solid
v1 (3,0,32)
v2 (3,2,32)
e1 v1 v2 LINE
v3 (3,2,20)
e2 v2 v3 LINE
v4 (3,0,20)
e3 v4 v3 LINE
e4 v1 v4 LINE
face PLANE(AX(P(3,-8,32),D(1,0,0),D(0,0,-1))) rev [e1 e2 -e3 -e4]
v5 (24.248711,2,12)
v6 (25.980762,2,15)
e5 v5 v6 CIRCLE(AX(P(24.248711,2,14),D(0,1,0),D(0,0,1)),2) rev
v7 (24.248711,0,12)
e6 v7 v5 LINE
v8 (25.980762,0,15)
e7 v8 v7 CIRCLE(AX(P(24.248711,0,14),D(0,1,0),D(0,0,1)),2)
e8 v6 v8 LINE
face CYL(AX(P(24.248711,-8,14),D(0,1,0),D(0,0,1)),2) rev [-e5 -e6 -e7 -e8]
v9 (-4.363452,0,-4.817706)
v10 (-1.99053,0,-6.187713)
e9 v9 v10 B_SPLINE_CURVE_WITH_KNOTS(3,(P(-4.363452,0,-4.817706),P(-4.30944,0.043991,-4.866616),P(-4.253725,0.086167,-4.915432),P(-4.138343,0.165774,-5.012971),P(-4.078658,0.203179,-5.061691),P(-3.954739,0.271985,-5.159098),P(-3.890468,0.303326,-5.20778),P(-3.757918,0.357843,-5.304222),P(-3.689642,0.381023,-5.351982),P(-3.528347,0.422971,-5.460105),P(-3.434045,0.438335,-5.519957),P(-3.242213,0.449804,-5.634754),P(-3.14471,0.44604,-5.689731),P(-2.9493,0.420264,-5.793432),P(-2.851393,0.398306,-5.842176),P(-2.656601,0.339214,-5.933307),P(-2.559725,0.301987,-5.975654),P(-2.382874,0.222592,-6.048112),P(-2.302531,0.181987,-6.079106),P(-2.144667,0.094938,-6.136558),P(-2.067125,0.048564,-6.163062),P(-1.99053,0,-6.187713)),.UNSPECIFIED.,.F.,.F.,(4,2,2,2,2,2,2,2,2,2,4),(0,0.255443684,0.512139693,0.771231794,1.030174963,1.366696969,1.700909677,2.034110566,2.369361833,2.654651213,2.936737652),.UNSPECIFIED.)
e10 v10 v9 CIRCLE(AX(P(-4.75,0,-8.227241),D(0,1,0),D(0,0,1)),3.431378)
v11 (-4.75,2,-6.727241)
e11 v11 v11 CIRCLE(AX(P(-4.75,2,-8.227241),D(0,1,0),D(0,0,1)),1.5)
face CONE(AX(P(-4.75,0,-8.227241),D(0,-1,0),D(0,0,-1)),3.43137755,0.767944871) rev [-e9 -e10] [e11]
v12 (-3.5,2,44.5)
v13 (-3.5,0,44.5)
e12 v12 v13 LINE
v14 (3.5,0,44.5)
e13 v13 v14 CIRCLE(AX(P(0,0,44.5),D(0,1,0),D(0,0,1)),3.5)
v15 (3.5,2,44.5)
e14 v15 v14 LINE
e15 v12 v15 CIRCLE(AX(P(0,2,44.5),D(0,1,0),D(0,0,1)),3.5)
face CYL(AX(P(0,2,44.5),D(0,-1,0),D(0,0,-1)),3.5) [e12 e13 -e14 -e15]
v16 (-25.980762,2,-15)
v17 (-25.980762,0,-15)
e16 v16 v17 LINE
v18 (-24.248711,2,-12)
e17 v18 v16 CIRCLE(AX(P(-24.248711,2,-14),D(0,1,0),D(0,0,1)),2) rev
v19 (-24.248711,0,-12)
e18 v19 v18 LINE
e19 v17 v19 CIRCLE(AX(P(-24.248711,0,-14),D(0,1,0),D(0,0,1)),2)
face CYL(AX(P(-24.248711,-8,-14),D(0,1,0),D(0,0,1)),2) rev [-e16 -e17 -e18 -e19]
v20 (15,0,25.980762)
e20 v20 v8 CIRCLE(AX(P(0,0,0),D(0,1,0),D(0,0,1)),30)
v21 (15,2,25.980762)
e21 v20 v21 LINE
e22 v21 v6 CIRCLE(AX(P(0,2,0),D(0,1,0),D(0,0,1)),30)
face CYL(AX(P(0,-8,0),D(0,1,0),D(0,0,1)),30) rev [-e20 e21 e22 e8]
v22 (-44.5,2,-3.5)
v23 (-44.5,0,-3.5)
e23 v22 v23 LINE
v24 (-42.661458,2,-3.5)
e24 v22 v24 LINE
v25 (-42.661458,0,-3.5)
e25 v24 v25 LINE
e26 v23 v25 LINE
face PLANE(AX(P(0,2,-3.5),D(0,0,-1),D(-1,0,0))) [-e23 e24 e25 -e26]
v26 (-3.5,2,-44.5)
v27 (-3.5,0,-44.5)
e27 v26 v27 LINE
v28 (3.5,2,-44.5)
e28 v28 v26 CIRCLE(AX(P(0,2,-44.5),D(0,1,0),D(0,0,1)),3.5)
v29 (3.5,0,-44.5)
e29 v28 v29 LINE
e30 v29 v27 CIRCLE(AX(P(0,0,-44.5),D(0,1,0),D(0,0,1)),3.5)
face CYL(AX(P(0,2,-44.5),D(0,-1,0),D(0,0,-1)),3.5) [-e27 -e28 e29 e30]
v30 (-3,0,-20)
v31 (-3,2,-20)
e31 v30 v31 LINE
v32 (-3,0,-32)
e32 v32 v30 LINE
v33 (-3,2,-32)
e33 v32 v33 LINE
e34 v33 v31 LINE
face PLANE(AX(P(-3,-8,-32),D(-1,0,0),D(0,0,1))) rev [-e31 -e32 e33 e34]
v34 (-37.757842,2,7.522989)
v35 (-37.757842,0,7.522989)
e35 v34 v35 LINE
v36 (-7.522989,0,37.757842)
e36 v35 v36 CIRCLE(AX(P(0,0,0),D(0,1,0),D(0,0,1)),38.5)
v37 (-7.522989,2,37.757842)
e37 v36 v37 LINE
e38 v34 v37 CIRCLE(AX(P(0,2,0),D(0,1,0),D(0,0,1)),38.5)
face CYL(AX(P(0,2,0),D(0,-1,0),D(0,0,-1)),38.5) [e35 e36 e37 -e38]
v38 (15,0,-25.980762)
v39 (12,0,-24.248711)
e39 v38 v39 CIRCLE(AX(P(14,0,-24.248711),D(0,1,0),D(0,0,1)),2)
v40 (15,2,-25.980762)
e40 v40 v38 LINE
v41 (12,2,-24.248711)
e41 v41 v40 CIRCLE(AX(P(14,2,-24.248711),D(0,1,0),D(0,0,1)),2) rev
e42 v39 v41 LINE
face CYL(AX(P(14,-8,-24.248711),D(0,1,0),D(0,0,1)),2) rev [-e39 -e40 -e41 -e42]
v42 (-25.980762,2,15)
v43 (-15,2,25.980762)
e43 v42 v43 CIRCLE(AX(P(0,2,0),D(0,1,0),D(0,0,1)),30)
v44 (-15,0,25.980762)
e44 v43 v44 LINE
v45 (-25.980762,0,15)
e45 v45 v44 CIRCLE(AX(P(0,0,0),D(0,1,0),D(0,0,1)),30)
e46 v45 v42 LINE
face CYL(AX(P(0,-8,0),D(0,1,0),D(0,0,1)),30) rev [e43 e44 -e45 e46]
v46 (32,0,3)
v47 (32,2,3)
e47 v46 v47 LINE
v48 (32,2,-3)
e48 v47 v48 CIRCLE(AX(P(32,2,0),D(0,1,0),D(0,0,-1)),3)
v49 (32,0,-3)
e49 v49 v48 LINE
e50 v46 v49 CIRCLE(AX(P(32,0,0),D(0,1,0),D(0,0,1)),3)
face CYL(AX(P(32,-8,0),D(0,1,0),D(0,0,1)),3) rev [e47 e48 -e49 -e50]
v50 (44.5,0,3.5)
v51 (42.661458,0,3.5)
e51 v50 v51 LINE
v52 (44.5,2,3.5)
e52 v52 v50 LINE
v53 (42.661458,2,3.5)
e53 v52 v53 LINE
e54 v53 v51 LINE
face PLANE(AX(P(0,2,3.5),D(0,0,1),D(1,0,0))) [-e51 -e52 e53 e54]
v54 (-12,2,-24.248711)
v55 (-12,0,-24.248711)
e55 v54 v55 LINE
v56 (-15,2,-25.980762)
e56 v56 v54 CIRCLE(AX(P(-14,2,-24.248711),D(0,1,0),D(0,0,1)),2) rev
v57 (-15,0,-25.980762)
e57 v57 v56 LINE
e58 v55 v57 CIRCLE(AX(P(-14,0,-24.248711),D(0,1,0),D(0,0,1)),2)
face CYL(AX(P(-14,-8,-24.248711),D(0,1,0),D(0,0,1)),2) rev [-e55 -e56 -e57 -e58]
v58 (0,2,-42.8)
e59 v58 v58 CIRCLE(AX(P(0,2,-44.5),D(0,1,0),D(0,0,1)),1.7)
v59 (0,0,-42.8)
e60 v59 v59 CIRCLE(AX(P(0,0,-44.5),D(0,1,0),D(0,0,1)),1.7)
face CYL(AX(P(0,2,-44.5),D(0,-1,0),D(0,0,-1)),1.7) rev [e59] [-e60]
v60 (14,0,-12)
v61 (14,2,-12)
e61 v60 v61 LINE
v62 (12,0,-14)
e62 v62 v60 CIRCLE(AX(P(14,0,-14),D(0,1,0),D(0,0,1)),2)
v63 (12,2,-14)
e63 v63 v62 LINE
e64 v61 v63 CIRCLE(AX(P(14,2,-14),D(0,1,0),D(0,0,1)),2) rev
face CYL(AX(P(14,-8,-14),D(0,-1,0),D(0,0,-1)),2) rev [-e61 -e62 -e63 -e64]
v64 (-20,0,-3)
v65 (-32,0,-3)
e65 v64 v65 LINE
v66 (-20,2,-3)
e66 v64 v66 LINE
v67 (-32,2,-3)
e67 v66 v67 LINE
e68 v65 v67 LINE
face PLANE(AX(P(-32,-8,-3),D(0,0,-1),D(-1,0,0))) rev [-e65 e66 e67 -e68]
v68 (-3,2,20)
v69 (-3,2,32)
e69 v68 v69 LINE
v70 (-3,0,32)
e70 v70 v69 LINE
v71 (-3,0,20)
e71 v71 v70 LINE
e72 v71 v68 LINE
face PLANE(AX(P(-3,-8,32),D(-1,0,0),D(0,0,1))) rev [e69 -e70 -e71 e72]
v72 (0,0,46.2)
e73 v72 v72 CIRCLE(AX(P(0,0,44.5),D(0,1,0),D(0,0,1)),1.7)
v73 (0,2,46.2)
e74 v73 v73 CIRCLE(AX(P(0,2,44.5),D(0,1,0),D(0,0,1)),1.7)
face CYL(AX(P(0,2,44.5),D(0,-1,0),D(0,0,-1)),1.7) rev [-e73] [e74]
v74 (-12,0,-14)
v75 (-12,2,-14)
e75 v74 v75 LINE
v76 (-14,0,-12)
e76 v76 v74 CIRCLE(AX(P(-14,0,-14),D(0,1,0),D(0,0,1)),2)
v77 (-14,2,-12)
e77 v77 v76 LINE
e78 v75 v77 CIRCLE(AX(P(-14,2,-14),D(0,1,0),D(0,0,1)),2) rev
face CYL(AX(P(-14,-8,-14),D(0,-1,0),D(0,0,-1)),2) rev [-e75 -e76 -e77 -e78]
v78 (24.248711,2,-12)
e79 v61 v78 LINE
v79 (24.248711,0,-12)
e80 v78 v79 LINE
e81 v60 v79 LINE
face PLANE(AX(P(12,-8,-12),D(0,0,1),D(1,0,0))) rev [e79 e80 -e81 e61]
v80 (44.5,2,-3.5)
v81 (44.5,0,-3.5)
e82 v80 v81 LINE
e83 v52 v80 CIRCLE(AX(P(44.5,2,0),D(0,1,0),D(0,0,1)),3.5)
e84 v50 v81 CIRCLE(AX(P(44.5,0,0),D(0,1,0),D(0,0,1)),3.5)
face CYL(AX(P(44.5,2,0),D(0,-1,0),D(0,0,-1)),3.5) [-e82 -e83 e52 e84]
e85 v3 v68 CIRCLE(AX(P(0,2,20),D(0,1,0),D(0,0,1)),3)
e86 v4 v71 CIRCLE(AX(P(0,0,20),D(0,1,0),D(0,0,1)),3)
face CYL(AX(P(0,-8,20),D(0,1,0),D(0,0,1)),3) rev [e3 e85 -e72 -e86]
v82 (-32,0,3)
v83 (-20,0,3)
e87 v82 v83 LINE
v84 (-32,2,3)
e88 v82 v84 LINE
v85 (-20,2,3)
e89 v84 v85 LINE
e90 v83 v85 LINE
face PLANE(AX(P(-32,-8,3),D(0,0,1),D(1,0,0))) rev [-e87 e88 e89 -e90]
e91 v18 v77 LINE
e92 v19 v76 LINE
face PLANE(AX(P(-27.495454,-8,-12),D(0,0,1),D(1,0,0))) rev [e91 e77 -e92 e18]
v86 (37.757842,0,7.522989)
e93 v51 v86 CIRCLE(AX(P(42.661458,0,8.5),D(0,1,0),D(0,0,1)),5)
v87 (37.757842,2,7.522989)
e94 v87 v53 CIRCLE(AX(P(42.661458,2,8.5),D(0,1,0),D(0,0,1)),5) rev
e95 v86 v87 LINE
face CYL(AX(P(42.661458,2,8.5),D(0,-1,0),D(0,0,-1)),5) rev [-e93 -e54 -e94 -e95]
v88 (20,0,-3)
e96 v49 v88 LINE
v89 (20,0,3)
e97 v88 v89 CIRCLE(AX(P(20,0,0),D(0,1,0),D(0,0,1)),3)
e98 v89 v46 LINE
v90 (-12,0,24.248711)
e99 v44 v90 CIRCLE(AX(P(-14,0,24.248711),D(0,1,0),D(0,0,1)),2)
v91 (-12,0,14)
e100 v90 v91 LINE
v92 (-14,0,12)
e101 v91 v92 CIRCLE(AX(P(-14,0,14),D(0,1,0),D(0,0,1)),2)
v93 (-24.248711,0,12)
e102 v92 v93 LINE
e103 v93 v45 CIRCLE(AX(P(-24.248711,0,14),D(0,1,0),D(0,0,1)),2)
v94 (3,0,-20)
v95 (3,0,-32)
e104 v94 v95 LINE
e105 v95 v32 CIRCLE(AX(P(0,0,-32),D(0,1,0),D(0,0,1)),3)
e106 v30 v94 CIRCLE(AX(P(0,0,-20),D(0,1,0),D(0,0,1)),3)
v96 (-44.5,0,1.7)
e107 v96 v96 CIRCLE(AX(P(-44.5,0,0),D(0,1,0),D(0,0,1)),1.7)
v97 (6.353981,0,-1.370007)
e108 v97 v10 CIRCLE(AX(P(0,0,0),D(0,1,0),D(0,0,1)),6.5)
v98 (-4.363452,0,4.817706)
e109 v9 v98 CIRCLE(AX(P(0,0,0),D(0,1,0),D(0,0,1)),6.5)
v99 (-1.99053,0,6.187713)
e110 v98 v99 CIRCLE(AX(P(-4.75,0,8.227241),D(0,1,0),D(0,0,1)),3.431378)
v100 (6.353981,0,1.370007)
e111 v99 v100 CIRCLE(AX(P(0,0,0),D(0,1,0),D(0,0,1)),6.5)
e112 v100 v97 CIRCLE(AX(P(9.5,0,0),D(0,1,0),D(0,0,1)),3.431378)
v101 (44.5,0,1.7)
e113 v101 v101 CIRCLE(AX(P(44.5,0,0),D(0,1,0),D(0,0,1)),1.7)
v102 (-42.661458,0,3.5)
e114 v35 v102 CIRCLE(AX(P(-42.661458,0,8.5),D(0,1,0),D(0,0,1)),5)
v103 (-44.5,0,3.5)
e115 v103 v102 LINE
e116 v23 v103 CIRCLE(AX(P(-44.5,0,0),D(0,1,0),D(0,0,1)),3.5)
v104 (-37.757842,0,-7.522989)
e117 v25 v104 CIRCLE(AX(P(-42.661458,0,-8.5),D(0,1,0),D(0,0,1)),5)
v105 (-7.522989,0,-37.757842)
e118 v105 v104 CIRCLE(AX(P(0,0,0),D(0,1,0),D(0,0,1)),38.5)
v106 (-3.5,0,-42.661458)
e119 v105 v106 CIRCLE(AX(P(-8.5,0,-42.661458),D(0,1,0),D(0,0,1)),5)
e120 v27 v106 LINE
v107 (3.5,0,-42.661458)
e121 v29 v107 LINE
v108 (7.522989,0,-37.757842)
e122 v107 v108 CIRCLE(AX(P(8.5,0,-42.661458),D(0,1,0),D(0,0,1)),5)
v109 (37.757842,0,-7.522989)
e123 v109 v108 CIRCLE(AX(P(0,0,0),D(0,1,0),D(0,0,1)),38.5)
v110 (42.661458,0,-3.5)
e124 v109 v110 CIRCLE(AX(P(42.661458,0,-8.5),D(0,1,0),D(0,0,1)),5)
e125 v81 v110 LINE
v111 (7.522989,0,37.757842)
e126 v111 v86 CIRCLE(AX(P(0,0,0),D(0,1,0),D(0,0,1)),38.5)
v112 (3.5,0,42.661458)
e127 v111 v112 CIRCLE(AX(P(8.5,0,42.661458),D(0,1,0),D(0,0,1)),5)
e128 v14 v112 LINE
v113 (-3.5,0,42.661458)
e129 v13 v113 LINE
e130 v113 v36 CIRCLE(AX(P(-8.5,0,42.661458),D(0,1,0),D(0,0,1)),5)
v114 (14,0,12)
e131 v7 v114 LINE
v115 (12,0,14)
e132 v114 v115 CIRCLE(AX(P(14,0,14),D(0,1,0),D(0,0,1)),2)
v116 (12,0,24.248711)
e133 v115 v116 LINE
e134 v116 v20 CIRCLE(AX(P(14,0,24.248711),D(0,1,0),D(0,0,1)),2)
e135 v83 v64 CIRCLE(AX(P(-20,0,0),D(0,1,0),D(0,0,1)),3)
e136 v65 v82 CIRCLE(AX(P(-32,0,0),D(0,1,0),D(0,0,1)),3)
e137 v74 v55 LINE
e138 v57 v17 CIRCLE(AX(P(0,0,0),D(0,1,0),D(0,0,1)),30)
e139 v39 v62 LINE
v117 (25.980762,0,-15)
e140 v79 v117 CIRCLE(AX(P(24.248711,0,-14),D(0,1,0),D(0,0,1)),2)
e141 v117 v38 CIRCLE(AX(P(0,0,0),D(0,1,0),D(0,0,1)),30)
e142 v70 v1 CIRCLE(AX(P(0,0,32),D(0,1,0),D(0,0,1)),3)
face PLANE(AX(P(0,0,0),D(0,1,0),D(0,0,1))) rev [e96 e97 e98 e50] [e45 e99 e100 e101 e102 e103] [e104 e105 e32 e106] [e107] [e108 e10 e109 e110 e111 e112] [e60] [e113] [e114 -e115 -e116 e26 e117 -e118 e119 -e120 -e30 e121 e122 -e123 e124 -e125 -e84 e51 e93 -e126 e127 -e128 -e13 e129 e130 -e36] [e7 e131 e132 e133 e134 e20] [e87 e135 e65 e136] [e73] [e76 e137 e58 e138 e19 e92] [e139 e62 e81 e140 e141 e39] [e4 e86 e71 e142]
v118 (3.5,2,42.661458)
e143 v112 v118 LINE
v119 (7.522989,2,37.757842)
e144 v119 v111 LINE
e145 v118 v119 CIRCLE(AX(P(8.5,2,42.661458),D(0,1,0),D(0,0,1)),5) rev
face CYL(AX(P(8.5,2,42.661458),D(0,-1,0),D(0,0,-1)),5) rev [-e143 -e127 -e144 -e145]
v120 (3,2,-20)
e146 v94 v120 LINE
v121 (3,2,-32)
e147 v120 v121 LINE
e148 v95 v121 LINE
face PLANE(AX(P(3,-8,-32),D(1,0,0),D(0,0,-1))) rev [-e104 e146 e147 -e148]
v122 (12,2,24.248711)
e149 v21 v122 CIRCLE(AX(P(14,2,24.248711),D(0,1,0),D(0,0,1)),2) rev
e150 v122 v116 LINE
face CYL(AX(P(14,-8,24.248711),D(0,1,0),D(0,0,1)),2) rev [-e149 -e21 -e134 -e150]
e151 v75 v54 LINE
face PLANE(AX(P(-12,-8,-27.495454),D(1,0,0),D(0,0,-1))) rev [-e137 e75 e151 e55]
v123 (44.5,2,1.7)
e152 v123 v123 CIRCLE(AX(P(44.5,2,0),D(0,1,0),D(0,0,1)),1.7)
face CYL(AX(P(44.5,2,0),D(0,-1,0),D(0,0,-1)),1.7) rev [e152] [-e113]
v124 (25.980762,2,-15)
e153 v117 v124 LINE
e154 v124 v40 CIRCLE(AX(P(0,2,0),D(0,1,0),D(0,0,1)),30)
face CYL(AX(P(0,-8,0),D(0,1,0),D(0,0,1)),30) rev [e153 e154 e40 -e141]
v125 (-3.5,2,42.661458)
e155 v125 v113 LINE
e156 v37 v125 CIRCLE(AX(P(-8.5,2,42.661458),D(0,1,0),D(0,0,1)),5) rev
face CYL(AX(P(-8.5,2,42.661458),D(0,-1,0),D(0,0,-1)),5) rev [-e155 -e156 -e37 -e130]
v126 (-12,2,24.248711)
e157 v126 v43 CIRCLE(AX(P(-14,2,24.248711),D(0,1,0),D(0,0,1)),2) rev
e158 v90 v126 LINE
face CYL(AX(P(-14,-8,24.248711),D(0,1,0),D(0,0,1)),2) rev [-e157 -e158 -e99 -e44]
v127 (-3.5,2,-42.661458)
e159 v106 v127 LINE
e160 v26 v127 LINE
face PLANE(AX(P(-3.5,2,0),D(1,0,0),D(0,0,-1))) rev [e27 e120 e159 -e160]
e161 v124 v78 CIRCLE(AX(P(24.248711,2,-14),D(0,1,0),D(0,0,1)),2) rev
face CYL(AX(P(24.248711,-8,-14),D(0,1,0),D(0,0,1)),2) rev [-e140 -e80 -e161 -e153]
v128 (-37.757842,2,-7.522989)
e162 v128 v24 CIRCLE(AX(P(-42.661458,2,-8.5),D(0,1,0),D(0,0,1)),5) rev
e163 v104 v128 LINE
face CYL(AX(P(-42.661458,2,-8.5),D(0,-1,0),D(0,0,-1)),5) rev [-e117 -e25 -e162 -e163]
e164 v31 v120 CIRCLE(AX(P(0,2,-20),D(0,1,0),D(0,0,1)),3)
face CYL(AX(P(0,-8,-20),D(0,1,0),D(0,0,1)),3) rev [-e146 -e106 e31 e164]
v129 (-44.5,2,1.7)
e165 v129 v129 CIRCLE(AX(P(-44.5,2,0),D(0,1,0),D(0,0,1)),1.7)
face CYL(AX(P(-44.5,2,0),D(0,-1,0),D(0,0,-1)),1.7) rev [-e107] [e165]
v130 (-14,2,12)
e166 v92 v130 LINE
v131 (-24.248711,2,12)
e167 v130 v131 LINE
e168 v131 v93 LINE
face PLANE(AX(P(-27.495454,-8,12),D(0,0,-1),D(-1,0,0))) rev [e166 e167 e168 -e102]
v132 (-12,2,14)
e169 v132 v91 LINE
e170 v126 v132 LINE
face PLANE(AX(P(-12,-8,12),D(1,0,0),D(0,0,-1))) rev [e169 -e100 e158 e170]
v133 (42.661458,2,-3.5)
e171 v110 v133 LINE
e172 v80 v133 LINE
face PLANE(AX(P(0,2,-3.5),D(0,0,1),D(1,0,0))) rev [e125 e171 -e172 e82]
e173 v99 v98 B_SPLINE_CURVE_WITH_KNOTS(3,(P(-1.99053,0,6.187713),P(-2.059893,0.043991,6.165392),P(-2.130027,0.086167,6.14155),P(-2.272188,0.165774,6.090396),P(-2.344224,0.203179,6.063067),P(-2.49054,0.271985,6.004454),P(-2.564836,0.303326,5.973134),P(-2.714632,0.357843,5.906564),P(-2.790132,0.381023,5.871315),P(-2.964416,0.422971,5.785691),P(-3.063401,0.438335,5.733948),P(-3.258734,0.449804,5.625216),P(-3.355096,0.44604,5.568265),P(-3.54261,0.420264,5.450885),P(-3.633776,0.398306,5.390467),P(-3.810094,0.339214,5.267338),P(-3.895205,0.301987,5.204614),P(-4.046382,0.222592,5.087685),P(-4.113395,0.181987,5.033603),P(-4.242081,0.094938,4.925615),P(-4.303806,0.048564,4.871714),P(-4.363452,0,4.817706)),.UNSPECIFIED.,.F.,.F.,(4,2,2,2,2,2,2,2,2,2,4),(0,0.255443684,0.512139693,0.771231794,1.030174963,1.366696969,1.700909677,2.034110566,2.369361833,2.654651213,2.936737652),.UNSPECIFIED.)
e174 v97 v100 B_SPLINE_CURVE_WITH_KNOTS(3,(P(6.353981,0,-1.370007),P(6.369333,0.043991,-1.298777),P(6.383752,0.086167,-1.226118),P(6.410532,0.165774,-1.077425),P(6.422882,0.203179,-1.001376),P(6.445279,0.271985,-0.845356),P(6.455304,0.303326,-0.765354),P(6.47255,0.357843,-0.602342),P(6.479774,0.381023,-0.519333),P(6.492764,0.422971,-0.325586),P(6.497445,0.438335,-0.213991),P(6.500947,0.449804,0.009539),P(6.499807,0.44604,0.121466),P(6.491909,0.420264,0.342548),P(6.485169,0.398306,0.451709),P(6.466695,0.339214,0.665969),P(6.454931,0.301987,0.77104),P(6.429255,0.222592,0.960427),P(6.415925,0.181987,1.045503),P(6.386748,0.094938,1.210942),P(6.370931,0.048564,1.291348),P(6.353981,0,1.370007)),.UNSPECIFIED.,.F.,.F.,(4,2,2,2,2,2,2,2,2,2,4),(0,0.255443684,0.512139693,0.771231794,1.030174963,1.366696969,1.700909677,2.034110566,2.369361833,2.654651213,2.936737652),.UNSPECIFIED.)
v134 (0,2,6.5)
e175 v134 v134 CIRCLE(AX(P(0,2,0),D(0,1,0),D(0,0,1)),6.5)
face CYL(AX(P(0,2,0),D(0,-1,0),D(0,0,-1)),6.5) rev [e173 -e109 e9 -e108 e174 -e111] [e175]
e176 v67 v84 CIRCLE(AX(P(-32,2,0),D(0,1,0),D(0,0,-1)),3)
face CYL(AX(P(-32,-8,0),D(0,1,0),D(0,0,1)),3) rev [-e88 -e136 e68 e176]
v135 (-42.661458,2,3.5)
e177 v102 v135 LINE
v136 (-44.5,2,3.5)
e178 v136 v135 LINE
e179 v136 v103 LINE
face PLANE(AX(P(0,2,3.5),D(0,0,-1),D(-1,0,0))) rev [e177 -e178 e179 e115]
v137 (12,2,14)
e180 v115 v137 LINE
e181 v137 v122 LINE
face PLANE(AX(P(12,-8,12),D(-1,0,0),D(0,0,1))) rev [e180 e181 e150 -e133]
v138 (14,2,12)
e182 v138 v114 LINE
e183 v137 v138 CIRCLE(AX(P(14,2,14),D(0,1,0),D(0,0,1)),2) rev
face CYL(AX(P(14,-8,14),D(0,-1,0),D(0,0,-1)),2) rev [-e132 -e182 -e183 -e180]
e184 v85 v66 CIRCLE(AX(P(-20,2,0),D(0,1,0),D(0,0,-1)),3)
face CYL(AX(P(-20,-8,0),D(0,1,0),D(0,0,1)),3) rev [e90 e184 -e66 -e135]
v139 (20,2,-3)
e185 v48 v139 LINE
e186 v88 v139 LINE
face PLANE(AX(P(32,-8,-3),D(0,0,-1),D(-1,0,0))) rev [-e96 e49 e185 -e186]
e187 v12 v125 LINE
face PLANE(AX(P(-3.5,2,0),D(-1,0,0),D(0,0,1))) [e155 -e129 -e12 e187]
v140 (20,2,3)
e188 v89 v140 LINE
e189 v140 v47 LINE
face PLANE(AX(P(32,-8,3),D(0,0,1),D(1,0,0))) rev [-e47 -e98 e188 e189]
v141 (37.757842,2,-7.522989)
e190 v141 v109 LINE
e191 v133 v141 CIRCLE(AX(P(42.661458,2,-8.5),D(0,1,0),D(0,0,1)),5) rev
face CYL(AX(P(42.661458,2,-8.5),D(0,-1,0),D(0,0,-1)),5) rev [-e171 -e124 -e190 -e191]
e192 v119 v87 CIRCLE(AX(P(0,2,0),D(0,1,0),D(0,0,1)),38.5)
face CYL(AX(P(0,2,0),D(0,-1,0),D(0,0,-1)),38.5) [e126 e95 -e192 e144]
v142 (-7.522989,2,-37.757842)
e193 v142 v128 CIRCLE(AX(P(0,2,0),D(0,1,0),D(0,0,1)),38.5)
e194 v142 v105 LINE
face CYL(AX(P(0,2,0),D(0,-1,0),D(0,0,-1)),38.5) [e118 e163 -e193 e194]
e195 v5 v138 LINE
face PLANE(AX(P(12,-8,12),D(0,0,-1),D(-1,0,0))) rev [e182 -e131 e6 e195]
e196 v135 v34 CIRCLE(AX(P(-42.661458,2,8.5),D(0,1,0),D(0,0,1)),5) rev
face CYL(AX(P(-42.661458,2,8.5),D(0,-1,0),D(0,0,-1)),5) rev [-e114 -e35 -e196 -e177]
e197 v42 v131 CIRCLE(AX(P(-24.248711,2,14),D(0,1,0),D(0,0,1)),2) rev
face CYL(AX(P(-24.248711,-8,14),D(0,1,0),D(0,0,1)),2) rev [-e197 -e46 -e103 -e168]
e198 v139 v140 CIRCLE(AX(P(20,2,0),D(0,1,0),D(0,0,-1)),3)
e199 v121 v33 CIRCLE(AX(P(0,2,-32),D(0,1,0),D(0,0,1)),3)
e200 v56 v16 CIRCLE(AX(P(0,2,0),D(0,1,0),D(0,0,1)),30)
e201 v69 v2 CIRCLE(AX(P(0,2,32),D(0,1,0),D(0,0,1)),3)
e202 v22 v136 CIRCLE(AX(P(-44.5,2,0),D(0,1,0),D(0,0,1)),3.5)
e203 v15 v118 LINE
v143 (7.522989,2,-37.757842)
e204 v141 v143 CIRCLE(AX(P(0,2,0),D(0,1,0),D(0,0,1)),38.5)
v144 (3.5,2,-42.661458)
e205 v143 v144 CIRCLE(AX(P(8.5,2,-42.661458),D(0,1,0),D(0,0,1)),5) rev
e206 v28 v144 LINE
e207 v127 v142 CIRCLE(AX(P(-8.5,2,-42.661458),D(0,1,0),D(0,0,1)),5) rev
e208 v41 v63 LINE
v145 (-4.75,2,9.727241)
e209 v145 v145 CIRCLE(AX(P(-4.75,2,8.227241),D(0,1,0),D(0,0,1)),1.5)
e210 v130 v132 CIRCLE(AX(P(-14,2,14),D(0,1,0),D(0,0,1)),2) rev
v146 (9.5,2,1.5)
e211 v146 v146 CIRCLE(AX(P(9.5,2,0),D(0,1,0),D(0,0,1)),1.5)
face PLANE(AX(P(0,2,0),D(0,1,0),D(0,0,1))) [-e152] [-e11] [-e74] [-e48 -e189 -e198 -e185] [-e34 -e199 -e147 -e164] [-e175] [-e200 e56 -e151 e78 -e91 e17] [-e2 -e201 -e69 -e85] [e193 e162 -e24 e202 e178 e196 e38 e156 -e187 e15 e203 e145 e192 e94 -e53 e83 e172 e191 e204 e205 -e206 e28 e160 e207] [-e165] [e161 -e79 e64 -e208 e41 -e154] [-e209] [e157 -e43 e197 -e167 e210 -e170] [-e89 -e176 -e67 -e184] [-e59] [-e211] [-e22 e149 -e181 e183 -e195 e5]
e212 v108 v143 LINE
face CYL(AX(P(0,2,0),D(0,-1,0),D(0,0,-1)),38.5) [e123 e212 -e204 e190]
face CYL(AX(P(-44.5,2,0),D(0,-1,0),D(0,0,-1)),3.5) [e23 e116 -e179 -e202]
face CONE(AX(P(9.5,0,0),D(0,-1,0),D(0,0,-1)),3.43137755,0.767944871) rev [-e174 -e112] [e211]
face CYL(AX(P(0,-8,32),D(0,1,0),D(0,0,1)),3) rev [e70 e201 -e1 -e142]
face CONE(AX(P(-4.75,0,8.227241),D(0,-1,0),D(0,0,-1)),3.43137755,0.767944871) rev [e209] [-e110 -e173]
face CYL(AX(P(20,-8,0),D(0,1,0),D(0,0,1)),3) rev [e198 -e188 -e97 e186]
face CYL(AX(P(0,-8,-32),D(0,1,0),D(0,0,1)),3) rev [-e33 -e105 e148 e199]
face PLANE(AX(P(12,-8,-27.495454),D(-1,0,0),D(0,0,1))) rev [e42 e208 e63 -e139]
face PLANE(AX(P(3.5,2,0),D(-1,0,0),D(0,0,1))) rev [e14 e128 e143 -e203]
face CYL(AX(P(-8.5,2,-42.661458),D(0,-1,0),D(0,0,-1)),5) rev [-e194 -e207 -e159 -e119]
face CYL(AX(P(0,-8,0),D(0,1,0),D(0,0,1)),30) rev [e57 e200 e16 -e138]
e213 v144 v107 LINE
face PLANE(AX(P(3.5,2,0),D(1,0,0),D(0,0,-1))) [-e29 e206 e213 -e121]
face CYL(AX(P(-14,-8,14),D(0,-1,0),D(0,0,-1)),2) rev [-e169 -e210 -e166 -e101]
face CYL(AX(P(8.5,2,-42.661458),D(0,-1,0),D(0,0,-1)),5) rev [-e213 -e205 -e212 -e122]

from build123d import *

# Parameters (mm, degrees)
SKETCH_2_R          = 38.5
SKETCH_2_R_2        = 6.5
SKETCH_2_R_3        = 1.5
EXTRUDE_1_DEPTH     = 2
CHAMFER_1_SIZE      = 2
CHAMFER_1_SIZE_2    = 1.93137755
SKETCH_3_R          = 1.7
EXTRUDE_2_DEPTH     = 2
FILLET_1_R          = 5
CUT_EXTRUDE_1_DEPTH = 10
FILLET_2_R          = 2
CUT_EXTRUDE_4_DEPTH = 10


with BuildPart() as part:
    # 草图2 → 凸台-拉伸1 (new body)
    with BuildSketch(Plane(origin=(0, 0, 0), x_dir=(1, 0, 0), z_dir=(0, 1, 0))):
        with Locations(Location((0, 0, 0), (0, 0, 270))):
            Circle(SKETCH_2_R)
        with Locations(Location((0, 0, 0), (0, 0, 270))):
            Circle(SKETCH_2_R_2, mode=Mode.SUBTRACT)
        with Locations(Location((9.5, 0, 0), (0, 0, 270))):
            Circle(SKETCH_2_R_3, mode=Mode.SUBTRACT)
        with Locations(Location((-4.75, -8.227241336, 0), (0, 0, 270))):
            Circle(SKETCH_2_R_3, mode=Mode.SUBTRACT)
        with Locations(Location((-4.75, 8.227241336, 0), (0, 0, 270))):
            Circle(SKETCH_2_R_3, mode=Mode.SUBTRACT)
    extrude(amount=EXTRUDE_1_DEPTH)

    # 倒角1
    # the kernel refuses this chamfer: 2, 1.93137755 mm, written as the material it takes off along each edge
    with BuildSketch(Plane(origin=(-4.75, 0, 8.227241336), x_dir=(0, 0, 1), z_dir=(-1, 0, 0))) as chamfer_1_piece_1:
        Polygon((1.5, CHAMFER_1_SIZE), (1.5 + CHAMFER_1_SIZE_2, 0), (1.5, 0), align=None)
    revolve(axis=Axis((-4.75, 0, 8.227241336), (0, 1, 0)), mode=Mode.SUBTRACT)
    with BuildSketch(Plane(origin=(-4.75, 0, -8.227241336), x_dir=(0, 0, 1), z_dir=(-1, 0, 0))) as chamfer_1_piece_2:
        Polygon((1.5, CHAMFER_1_SIZE), (1.5 + CHAMFER_1_SIZE_2, 0), (1.5, 0), align=None)
    revolve(axis=Axis((-4.75, 0, -8.227241336), (0, 1, 0)), mode=Mode.SUBTRACT)
    with BuildSketch(Plane(origin=(9.5, 0, 0), x_dir=(0, 0, 1), z_dir=(-1, 0, 0))) as chamfer_1_piece_3:
        Polygon((1.5, CHAMFER_1_SIZE), (1.5 + CHAMFER_1_SIZE_2, 0), (1.5, 0), align=None)
    revolve(axis=Axis((9.5, 0, 0), (0, 1, 0)), mode=Mode.SUBTRACT)

    # 草图3 → 凸台-拉伸2 (add)
    # profile 1 of 4: a face of its own
    with BuildSketch(Plane(origin=(0, 0, 0), x_dir=(1, 0, 0), z_dir=(0, 1, 0))):
        with BuildLine():
            Line((44.5, 3.5), (38.340579025, 3.5))
            ThreePointArc((38.340579025, 3.5), (38.5, 0), (38.340579025, -3.5))
            Line((38.340579025, -3.5), (44.5, -3.5))
            ThreePointArc((44.5, -3.5), (48, 0), (44.5, 3.5))
        make_face()
        with Locations(Location((44.5, 0, 0), (0, 0, 270))):
            Circle(SKETCH_3_R, mode=Mode.SUBTRACT)
    # profile 2 of 4: a face of its own
    with BuildSketch(Plane(origin=(0, 0, 0), x_dir=(1, 0, 0), z_dir=(0, 1, 0))):
        with BuildLine():
            Line((-3.5, 44.5), (-3.5, 38.340579025))
            ThreePointArc((-3.5, 38.340579025), (0, 38.5), (3.5, 38.340579025))
            Line((3.5, 38.340579025), (3.5, 44.5))
            ThreePointArc((3.5, 44.5), (0, 48), (-3.5, 44.5))
        make_face()
        with Locations(Location((0, 44.5, 0), (0, 0, 270))):
            Circle(SKETCH_3_R, mode=Mode.SUBTRACT)
    # profile 3 of 4: a face of its own
    with BuildSketch(Plane(origin=(0, 0, 0), x_dir=(1, 0, 0), z_dir=(0, 1, 0))):
        with BuildLine():
            Line((3.5, -44.5), (3.5, -38.340579025))
            ThreePointArc((3.5, -38.340579025), (0, -38.5), (-3.5, -38.340579025))
            Line((-3.5, -38.340579025), (-3.5, -44.5))
            ThreePointArc((-3.5, -44.5), (0, -48), (3.5, -44.5))
        make_face()
        with Locations(Location((0, -44.5, 0), (0, 0, 270))):
            Circle(SKETCH_3_R, mode=Mode.SUBTRACT)
    # profile 4 of 4: a face of its own
    with BuildSketch(Plane(origin=(0, 0, 0), x_dir=(1, 0, 0), z_dir=(0, 1, 0))):
        with BuildLine():
            Line((-44.5, -3.5), (-38.340579025, -3.5))
            ThreePointArc((-38.340579025, -3.5), (-38.5, 0), (-38.340579025, 3.5))
            Line((-38.340579025, 3.5), (-44.5, 3.5))
            ThreePointArc((-44.5, 3.5), (-48, 0), (-44.5, -3.5))
        make_face()
        with Locations(Location((-44.5, 0, 0), (0, 0, 270))):
            Circle(SKETCH_3_R, mode=Mode.SUBTRACT)
    extrude(amount=EXTRUDE_2_DEPTH)

    # 圆角1
    fillet_1_edges = [part.edges().sort_by_distance(p)[0] for p in [
        (38.340579025, 1, -3.5),
        (38.340579025, 1, 3.5),
        (-3.5, 1, -38.340579025),
        (3.5, 1, -38.340579025),
        (3.5, 1, 38.340579025),
        (-3.5, 1, 38.340579025),
        (-38.340579025, 1, 3.5),
        (-38.340579025, 1, -3.5),
    ]]
    fillet(fillet_1_edges, radius=FILLET_1_R)

    # 草图4 → 切除-拉伸1 (cut)
    with BuildSketch(Plane(origin=(0, 2, 0), x_dir=(1, 0, 0), z_dir=(0, 1, 0))):
        with BuildLine():
            Line((-12, 27.49545417), (-12, 12))
            Line((-12, 12), (-27.49545417, 12))
            ThreePointArc((-27.49545417, 12), (-21.213203436, 21.213203436), (-12, 27.49545417))
        make_face()
        with BuildLine():
            Line((-27.49545417, -12), (-12, -12))
            Line((-12, -12), (-12, -27.49545417))
            ThreePointArc((-12, -27.49545417), (-21.213203436, -21.213203436), (-27.49545417, -12))
        make_face()
        with BuildLine():
            Line((12, 27.49545417), (12, 12))
            Line((12, 12), (27.49545417, 12))
            ThreePointArc((27.49545417, 12), (21.213203436, 21.213203436), (12, 27.49545417))
        make_face()
        with BuildLine():
            Line((12, -12), (12, -27.49545417))
            ThreePointArc((12, -27.49545417), (21.213203436, -21.213203436), (27.49545417, -12))
            Line((27.49545417, -12), (12, -12))
        make_face()
    extrude(amount=-CUT_EXTRUDE_1_DEPTH, mode=Mode.SUBTRACT)

    # 圆角2
    fillet_2_edges = [part.edges().sort_by_distance(p)[0] for p in [
        (-12, 1, 27.49545417),
        (-27.49545417, 1, 12),
        (-12, 1, 12),
        (12, 1, -27.49545417),
        (27.49545417, 1, -12),
        (12, 1, -12),
        (27.49545417, 1, 12),
        (12, 1, 27.49545417),
        (12, 1, 12),
        (-27.49545417, 1, -12),
        (-12, 1, -27.49545417),
        (-12, 1, -12),
    ]]
    fillet(fillet_2_edges, radius=FILLET_2_R)

    # 草图5 → 切除-拉伸4 (cut)
    with BuildSketch(Plane(origin=(0, 2, 0), x_dir=(1, 0, 0), z_dir=(0, 1, 0))):
        with BuildLine():
            Line((3, 32), (3, 20))
            ThreePointArc((3, 20), (0, 17), (-3, 20))
            Line((-3, 20), (-3, 32))
            ThreePointArc((-3, 32), (0, 35), (3, 32))
        make_face()
        with BuildLine():
            Line((32, 3), (20, 3))
            ThreePointArc((20, 3), (17, 0), (20, -3))
            Line((20, -3), (32, -3))
            ThreePointArc((32, -3), (35, 0), (32, 3))
        make_face()
        with BuildLine():
            Line((-3, -32), (-3, -20))
            ThreePointArc((-3, -20), (0, -17), (3, -20))
            Line((3, -20), (3, -32))
            ThreePointArc((3, -32), (0, -35), (-3, -32))
        make_face()
        with BuildLine():
            Line((-32, -3), (-20, -3))
            ThreePointArc((-20, -3), (-17, 0), (-20, 3))
            Line((-20, 3), (-32, 3))
            ThreePointArc((-32, 3), (-35, 0), (-32, -3))
        make_face()
    extrude(amount=-CUT_EXTRUDE_4_DEPTH, mode=Mode.SUBTRACT)


solid = part.part
